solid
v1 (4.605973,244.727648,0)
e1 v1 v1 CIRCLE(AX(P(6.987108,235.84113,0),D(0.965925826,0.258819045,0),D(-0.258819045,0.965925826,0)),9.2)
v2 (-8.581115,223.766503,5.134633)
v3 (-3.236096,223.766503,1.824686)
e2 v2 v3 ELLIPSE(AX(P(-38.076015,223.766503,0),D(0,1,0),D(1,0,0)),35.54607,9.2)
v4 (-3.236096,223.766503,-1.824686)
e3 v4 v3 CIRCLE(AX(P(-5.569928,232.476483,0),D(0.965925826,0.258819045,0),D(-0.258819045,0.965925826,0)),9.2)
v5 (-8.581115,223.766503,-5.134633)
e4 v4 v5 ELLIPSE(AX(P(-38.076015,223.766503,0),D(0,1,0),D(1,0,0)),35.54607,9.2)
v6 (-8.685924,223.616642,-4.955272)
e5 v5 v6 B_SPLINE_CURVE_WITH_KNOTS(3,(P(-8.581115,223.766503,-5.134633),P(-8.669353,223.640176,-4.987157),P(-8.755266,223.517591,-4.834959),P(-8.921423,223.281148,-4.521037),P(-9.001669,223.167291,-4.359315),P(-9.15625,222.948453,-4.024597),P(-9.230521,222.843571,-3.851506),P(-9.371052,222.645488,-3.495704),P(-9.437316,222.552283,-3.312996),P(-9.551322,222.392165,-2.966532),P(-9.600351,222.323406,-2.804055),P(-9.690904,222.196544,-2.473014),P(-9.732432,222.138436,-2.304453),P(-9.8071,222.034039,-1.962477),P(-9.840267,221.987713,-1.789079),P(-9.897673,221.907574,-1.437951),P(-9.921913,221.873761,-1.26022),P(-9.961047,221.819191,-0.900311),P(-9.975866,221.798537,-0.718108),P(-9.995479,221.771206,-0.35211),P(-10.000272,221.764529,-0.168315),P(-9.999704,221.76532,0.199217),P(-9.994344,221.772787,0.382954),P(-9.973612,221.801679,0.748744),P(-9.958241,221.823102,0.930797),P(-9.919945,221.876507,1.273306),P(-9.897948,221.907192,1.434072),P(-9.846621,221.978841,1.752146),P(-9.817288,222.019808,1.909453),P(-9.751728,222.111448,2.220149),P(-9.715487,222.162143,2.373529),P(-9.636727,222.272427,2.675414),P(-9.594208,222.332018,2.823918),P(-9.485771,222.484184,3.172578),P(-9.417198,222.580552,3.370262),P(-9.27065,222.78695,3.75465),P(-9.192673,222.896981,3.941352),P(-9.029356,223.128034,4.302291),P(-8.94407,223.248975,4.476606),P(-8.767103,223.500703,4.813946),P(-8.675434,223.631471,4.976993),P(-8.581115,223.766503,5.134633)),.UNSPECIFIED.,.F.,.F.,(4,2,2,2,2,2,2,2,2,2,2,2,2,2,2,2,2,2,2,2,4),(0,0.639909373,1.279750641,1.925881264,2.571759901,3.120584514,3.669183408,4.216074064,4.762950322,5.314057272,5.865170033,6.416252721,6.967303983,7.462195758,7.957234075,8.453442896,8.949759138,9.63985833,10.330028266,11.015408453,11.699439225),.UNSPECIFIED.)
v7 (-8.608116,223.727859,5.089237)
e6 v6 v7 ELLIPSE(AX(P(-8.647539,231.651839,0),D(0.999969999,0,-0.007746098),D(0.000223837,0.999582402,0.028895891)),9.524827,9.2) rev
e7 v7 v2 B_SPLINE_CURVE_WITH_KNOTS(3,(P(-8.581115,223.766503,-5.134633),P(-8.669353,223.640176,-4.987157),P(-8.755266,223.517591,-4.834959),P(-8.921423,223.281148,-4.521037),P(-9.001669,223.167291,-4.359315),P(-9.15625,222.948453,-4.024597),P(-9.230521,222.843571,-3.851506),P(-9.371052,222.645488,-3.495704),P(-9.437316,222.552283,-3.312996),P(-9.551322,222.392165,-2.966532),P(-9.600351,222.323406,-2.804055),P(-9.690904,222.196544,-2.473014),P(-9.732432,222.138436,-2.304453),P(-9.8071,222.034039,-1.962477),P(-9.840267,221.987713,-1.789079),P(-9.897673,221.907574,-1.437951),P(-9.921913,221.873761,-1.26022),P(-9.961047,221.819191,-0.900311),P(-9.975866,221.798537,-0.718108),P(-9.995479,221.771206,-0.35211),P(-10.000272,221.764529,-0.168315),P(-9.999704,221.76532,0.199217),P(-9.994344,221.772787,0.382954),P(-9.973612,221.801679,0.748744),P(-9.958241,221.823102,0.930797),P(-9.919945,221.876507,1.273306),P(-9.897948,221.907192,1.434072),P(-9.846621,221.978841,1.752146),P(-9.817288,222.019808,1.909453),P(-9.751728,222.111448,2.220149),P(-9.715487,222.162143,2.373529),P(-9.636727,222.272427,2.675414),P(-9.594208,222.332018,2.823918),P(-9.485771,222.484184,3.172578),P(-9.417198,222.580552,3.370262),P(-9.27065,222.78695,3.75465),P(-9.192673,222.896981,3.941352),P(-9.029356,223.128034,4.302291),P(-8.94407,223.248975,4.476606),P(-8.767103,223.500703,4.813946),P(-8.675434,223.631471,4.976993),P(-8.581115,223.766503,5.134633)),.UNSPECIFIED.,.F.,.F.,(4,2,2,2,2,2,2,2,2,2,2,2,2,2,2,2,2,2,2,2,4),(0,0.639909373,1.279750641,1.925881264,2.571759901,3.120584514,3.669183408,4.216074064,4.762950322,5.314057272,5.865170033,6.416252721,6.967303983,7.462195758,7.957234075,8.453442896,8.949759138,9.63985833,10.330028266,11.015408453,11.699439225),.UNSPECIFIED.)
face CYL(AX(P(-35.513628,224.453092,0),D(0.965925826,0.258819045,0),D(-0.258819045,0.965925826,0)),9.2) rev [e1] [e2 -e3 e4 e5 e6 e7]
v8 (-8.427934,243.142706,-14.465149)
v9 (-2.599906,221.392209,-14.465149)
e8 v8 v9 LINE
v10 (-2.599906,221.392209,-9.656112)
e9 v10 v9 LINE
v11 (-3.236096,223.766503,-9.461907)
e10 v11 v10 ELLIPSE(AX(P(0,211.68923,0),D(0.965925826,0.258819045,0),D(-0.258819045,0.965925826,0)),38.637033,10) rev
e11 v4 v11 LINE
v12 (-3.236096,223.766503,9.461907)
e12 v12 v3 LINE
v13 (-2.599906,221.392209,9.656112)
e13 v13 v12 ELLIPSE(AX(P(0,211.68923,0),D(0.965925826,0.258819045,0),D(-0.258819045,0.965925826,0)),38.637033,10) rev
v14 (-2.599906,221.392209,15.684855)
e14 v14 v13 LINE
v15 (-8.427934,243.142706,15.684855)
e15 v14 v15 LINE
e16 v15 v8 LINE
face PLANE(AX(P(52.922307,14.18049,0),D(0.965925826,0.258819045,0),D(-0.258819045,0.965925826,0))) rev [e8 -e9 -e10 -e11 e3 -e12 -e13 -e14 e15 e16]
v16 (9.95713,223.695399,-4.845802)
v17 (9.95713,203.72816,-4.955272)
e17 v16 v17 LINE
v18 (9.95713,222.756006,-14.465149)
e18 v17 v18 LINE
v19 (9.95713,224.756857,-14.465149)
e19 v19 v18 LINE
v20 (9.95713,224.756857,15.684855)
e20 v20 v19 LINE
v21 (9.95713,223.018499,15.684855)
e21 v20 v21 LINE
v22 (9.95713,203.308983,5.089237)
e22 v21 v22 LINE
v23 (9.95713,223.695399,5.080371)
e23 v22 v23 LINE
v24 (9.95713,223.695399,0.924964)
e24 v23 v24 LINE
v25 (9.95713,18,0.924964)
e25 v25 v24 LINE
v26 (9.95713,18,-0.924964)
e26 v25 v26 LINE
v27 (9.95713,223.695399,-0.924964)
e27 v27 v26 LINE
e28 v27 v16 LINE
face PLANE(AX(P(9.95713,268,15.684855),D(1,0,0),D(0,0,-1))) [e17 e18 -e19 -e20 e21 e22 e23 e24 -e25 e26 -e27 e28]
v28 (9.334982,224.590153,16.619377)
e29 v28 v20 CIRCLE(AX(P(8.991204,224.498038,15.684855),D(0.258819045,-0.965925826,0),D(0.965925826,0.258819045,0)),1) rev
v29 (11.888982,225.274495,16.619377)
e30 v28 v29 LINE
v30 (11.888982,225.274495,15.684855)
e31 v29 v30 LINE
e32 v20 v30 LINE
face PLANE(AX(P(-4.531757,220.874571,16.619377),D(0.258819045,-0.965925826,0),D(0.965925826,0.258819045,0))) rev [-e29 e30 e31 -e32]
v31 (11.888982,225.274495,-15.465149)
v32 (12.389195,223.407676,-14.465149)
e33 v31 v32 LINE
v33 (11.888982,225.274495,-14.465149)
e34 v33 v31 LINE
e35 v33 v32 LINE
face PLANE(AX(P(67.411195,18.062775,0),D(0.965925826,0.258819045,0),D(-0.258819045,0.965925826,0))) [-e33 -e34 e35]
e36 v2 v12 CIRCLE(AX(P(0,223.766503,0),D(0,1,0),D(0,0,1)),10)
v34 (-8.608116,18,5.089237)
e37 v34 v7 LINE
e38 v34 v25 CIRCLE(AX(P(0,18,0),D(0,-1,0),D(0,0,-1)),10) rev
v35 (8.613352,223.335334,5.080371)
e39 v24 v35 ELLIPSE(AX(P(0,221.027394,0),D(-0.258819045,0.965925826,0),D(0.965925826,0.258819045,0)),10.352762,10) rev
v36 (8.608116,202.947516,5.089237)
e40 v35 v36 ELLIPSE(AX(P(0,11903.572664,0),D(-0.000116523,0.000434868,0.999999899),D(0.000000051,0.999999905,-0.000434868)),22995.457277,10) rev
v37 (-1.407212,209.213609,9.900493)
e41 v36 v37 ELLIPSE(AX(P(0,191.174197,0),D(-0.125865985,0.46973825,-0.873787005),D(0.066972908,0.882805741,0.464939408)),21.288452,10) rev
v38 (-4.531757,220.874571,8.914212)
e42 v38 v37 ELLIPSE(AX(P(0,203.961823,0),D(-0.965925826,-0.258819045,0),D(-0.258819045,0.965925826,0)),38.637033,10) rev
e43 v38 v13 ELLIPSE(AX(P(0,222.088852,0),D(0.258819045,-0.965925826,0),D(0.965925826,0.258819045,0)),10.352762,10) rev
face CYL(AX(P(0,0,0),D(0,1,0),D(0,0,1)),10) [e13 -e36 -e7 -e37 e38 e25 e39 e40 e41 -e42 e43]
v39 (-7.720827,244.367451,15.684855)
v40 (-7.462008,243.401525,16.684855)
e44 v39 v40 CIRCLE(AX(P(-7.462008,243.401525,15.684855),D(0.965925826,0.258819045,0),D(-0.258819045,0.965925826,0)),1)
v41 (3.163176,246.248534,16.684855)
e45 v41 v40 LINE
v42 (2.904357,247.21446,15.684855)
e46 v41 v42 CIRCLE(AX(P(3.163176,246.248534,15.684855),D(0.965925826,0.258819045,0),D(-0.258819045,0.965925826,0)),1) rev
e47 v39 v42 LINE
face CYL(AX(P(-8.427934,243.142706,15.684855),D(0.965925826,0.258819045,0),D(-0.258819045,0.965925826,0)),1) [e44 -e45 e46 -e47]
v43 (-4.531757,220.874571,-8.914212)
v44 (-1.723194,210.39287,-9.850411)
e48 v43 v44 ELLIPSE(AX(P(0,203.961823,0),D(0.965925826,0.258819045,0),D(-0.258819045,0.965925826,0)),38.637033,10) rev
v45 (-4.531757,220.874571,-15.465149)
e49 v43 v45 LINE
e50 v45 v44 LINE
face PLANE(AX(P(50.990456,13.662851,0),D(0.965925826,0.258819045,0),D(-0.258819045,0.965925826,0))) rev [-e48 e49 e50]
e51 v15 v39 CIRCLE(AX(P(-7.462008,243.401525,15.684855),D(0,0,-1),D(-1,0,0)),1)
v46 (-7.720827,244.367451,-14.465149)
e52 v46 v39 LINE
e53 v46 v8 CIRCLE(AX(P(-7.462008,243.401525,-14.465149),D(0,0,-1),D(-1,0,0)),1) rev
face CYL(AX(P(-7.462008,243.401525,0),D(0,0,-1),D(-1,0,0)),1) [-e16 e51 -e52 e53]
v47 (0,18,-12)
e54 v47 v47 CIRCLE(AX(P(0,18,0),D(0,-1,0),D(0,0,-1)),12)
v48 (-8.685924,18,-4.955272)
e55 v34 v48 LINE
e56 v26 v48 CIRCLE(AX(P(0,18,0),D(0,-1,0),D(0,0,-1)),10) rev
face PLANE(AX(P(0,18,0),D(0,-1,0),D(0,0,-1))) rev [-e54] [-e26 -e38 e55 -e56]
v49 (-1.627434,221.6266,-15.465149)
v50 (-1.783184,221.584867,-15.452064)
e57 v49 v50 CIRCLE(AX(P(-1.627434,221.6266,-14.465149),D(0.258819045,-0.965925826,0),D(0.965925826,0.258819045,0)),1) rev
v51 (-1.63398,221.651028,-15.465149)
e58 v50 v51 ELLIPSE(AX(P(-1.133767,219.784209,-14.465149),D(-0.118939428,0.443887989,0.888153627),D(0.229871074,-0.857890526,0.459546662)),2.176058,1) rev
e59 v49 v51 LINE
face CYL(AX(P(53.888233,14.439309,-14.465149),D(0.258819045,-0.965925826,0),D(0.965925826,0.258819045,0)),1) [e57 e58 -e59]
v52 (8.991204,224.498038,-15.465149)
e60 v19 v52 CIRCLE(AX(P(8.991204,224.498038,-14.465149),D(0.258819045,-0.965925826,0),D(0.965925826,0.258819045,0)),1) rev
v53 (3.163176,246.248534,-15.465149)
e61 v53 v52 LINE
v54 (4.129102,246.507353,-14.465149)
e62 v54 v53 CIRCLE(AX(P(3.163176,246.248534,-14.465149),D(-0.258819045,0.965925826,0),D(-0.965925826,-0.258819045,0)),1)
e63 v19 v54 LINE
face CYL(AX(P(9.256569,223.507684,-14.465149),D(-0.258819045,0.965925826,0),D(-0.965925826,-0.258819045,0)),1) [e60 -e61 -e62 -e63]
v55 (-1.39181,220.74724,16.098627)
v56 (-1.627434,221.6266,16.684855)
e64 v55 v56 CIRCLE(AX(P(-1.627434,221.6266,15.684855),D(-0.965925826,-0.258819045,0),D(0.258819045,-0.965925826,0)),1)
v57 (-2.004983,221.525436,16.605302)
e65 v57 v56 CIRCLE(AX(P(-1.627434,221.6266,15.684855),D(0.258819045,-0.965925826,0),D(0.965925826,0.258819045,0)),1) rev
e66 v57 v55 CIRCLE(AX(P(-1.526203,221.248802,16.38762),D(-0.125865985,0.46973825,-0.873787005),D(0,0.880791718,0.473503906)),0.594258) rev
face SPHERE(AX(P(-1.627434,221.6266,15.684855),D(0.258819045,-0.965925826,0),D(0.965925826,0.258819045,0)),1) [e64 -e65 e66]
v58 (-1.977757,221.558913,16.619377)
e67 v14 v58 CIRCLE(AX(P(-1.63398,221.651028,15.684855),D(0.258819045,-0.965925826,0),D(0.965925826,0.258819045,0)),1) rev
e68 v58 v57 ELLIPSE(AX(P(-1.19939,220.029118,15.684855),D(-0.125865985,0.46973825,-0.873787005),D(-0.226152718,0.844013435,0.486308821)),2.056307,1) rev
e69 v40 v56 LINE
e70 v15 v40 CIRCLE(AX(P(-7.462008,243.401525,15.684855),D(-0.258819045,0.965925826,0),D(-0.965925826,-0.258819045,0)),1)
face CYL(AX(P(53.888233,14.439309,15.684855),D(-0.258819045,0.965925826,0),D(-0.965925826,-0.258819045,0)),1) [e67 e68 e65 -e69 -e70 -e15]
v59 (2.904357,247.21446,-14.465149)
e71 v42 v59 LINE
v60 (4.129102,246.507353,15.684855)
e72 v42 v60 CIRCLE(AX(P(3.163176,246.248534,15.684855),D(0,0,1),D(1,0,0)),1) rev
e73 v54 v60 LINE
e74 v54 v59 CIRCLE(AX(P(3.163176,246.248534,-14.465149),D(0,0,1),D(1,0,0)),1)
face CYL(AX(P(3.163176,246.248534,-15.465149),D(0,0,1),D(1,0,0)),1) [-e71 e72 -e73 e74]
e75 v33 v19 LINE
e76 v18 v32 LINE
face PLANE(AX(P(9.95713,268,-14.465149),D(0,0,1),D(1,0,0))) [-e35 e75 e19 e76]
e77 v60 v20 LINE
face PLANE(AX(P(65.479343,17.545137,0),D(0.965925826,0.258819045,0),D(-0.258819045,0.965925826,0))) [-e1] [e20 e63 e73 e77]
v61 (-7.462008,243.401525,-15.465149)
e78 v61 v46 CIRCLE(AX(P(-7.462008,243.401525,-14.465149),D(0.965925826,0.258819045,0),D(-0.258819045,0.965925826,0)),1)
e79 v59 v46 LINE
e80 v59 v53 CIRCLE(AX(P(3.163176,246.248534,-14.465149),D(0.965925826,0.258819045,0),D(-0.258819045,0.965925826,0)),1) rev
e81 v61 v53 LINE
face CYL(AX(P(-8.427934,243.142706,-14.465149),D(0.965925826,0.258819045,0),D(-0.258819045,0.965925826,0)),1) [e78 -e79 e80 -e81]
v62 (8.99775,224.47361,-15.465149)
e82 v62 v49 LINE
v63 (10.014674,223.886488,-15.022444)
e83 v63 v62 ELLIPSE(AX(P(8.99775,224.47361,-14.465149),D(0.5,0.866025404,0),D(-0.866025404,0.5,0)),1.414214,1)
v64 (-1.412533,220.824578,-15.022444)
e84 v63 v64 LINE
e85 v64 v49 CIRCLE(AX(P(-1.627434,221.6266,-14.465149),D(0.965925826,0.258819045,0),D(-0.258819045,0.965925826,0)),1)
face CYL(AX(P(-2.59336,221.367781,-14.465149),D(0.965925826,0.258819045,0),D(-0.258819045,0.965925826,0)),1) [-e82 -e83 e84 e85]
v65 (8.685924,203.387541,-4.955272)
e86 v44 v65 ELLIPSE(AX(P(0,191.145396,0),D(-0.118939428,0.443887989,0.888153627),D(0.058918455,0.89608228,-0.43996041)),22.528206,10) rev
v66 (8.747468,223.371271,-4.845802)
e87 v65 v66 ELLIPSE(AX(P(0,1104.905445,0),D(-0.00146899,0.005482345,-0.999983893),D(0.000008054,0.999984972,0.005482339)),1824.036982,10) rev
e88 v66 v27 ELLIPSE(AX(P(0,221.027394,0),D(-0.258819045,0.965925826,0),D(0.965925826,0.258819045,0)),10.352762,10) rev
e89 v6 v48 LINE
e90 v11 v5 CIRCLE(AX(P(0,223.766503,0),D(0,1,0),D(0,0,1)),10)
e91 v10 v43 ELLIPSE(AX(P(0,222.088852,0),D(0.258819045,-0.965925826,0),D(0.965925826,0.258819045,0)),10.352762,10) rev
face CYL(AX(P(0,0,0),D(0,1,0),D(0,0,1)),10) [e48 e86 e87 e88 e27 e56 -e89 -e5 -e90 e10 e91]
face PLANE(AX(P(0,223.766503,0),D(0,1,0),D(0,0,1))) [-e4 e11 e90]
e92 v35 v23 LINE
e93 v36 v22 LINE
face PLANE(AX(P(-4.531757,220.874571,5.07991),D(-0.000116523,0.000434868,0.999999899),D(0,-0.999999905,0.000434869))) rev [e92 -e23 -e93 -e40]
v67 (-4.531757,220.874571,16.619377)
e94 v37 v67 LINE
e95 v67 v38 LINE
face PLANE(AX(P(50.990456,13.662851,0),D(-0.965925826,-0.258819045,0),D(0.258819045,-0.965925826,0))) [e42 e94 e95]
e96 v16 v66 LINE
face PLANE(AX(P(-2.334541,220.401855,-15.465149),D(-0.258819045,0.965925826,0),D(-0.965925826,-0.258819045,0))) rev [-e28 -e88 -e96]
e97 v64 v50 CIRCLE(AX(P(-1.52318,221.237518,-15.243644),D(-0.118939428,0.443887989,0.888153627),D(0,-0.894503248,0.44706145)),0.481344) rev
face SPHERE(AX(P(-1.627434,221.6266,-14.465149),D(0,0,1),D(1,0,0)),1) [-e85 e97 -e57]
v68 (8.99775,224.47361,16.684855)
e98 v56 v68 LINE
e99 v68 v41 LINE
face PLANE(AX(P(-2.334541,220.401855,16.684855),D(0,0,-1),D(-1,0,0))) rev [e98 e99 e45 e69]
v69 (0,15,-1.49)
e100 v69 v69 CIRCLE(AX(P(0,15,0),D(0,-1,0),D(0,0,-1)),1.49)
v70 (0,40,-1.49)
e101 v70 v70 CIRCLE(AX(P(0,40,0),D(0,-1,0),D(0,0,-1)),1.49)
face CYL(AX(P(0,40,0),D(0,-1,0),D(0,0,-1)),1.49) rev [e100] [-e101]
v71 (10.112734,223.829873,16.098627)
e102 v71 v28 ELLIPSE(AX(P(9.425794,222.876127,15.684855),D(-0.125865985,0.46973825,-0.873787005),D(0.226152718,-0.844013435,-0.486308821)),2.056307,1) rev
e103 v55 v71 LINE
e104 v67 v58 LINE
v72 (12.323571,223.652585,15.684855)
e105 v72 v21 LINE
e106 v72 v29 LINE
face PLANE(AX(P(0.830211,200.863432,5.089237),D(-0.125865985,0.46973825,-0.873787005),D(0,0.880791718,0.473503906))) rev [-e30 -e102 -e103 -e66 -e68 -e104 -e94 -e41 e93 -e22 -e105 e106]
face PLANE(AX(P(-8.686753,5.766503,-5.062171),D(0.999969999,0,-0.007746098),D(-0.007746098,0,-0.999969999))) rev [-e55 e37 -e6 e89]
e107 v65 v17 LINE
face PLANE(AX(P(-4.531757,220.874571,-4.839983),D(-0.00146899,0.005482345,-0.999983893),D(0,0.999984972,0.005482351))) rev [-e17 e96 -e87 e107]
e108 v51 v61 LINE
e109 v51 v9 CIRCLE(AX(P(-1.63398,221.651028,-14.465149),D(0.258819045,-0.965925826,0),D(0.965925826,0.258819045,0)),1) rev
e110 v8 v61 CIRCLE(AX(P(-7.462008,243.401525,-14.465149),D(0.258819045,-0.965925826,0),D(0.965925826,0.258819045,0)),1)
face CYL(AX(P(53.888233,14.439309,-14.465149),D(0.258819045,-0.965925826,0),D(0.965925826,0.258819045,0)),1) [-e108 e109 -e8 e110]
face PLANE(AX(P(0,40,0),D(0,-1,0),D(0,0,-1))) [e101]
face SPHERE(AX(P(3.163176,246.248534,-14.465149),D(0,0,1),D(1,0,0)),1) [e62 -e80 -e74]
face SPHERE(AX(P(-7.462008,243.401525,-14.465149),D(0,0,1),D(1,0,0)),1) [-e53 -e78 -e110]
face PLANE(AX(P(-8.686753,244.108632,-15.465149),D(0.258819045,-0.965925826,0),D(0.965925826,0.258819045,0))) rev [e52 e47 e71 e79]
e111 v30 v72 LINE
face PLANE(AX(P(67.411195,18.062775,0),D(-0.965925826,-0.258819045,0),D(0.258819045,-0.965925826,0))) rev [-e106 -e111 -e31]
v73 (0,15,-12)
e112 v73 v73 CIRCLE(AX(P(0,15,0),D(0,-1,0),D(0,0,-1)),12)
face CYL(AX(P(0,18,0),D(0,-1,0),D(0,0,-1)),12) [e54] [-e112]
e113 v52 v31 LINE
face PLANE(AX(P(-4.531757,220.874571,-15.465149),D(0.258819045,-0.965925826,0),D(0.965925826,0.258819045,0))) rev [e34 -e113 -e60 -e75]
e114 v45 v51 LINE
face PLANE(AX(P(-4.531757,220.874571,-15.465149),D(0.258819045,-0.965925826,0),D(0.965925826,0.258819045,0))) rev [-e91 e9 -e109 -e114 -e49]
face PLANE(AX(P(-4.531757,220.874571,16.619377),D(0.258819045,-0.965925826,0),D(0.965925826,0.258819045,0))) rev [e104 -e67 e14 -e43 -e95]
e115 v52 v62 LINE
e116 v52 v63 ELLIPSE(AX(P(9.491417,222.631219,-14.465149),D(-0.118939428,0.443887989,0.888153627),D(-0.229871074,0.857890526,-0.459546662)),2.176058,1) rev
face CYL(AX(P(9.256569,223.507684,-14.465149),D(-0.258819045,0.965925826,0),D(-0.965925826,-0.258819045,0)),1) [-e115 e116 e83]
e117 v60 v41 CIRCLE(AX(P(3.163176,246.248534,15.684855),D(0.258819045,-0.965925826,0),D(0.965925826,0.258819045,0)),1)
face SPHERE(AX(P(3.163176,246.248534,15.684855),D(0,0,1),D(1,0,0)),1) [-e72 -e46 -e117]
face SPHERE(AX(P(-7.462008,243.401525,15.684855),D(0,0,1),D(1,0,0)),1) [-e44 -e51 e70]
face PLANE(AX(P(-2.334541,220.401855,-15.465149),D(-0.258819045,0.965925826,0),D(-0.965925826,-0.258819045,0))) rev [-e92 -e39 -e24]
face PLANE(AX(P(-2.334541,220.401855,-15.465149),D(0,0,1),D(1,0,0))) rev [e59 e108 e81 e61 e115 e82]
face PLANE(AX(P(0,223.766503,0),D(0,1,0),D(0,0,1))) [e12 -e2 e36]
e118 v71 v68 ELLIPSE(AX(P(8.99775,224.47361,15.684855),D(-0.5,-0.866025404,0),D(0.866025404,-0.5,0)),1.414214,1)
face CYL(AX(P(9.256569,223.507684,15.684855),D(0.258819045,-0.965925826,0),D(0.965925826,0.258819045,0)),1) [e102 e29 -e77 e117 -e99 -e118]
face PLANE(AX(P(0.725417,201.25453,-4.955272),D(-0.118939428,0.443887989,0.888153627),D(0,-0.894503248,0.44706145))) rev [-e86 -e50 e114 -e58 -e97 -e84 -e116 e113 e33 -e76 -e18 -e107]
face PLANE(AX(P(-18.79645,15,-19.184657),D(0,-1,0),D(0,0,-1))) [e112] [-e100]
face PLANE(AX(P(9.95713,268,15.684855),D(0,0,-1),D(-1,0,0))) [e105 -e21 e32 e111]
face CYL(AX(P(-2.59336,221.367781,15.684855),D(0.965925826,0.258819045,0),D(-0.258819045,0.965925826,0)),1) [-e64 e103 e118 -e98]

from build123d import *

# Parameters (mm, degrees)
SKETCH_1_R               = 15
SKETCH_1_R_2             = 10
SKETCH_1_R_3             = 1.070370935
EXTRUDE_2_DEPTH          = 3
EXTRUDE_7_DEPTH          = 220.766502815
EXTRUDE_7_DEPTH_BACK     = 3
SKETCH_3_R               = 10
SKETCH_6_W               = 32.150004278
SKETCH_6_H               = 24.543060803
EXTRUDE_8_DEPTH          = 13
SKETCH_7_R               = 9.2
CUT_EXTRUDE_1_DEPTH      = 44
CUT_EXTRUDE_2_DEPTH      = 218
FILLET_1_R               = 1
FILLET_2_R               = 1
FILLET_3_R               = 1
EXTRUDE_9_DEPTH          = 15
EXTRUDE_9_DEPTH_BACK     = 2
SKETCH_10_W              = 8.615383554
SKETCH_10_H              = 30.150004278
CUT_EXTRUDE_3_DEPTH      = 265
CUT_EXTRUDE_4_DEPTH      = 10
CUT_EXTRUDE_4_DEPTH_BACK = 111
SKETCH_12_W              = 40.878647102
SKETCH_12_H              = 15
SKETCH_13_R              = 12
EXTRUDE_10_DEPTH         = 3
SKETCH_14_R              = 1.49
CUT_EXTRUDE_5_DEPTH      = 25


with BuildPart() as part:
    # 草图1 → 凸台-拉伸2 (new body)
    with BuildSketch(Plane(origin=(0, 0, 0), x_dir=(1, 0, 0), z_dir=(0, 1, 0))):
        with Locations(Location((0, 0, 0), (0, 0, 270))):
            Circle(SKETCH_1_R)
        with Locations(Location((0, 0, 0), (0, 0, 270))):
            Circle(SKETCH_1_R_2, mode=Mode.SUBTRACT)
        with Locations(Location((12, 0, 0), (0, 0, 270))):
            Circle(SKETCH_1_R_3, mode=Mode.SUBTRACT)
        with Locations(Location((-12, 0, 0), (0, 0, 270))):
            Circle(SKETCH_1_R_3, mode=Mode.SUBTRACT)
        with Locations(Location((0, 12, 0), (0, 0, 270))):
            Circle(SKETCH_1_R_3, mode=Mode.SUBTRACT)
        with Locations(Location((0, -12, 0), (0, 0, 270))):
            Circle(SKETCH_1_R_3, mode=Mode.SUBTRACT)
    extrude(amount=EXTRUDE_2_DEPTH)

    # 草图3 → 凸台-拉伸7 (add, two sides: drawn at the far end of the back side and taken through both)
    with BuildSketch(Plane(origin=(0, 3, 0), x_dir=(1, 0, 0), z_dir=(0, 1, 0)).offset(-EXTRUDE_7_DEPTH_BACK)):
        with Locations(Location((0, 0, 0), (0, 0, 270))):
            Circle(SKETCH_3_R)
    extrude(amount=EXTRUDE_7_DEPTH + EXTRUDE_7_DEPTH_BACK)

    # 草图6 → 凸台-拉伸8 (add)
    with BuildSketch(Plane(origin=(65.479343136, 17.545137114, 0), x_dir=(0, 0, 1), z_dir=(-0.9659258262890673, -0.25881904510252474, 0))):
        with Locations((0.609852797, 225.767598204)):
            Rectangle(SKETCH_6_W, SKETCH_6_H)
    extrude(amount=EXTRUDE_8_DEPTH)

    # 草图7 → 切除-拉伸1 (cut)
    with BuildSketch(Plane(origin=(65.479343136, 17.545137114, 0), x_dir=(0, 0, -1), z_dir=(0.9659258262890673, 0.25881904510252474, 0))):
        with Locations(Location((0, 225.99664207, 0), (0, 0, 90))):
            Circle(SKETCH_7_R)
    extrude(amount=-CUT_EXTRUDE_1_DEPTH, mode=Mode.SUBTRACT)

    # 草图8 → 切除-拉伸2 (cut)
    with BuildSketch(Plane(origin=(0, 223.766502815, 0), x_dir=(1, 0, 0), z_dir=(0, 1, 0))):
        Polygon((-8.686752569, 5.062170738), (-8.608116415, -5.089236857), (-12.71958383, -5.121085641), (-12.798219984, 5.030321955), align=None)
    extrude(amount=-CUT_EXTRUDE_2_DEPTH, mode=Mode.SUBTRACT)

    # 圆角1
    fillet_1_edges = [part.edges().sort_by_distance(p)[0] for p in [
        (-2.408234698, 245.790955307, -15.465149342),
        (3.870283173, 247.473279101, 0.609852797),
        (-2.408234698, 245.790955307, 16.684854936),
        (-8.686752569, 244.108631514, 0.609852797),
    ]]
    fillet(fillet_1_edges, radius=FILLET_1_R)

    # 圆角2
    # the kernel refuses this fillet: 1 mm, written as the material it takes off along each edge
    with BuildSketch(Plane(origin=(3.163176392, 246.248534229, -14.465149342), x_dir=(0.9659258262890673, 0.25881904510252474, 0), z_dir=(0, 0, -1))) as fillet_2_piece_1_section:
        Polygon((0, 0), (FILLET_2_R * 1.02, 0), (FILLET_2_R * 1.02, -FILLET_2_R * 1.02), (0, -FILLET_2_R * 1.02), align=None)
    fillet_2_piece_1 = extrude(amount=FILLET_2_R * 1.02, mode=Mode.PRIVATE)
    fillet_2_piece_1 = fillet_2_piece_1 - Plane(origin=(3.163176392, 246.248534229, -14.465149342), x_dir=(-0.49999999999999645, -0.8660254037844407, 0), z_dir=(0, 0, -1)) * Sphere(FILLET_2_R, mode=Mode.PRIVATE)
    add(fillet_2_piece_1, mode=Mode.SUBTRACT)
    with BuildSketch(Plane(origin=(-7.462007697, 243.401524733, -14.465149342), x_dir=(0, 0, -1), z_dir=(-0.9659258262890673, -0.25881904510252474, 0))) as fillet_2_piece_2_section:
        Polygon((0, 0), (FILLET_2_R * 1.02, 0), (FILLET_2_R * 1.02, -FILLET_2_R * 1.02), (0, -FILLET_2_R * 1.02), align=None)
    fillet_2_piece_2 = extrude(amount=FILLET_2_R * 1.02, mode=Mode.PRIVATE)
    fillet_2_piece_2 = fillet_2_piece_2 - Plane(origin=(-7.462007697, 243.401524733, -14.465149342), x_dir=(0.1830127018922222, -0.6830127018922186, 0.7071067811865475), z_dir=(-0.9659258262890673, -0.25881904510252474, 0)) * Sphere(FILLET_2_R, mode=Mode.PRIVATE)
    add(fillet_2_piece_2, mode=Mode.SUBTRACT)
    with BuildSketch(Plane(origin=(-7.462007697, 243.401524733, 15.684854936), x_dir=(0, 0, 1), z_dir=(-0.9659258262890673, -0.25881904510252474, 0))) as fillet_2_piece_3_section:
        Polygon((0, 0), (FILLET_2_R * 1.02, 0), (FILLET_2_R * 1.02, FILLET_2_R * 1.02), (0, FILLET_2_R * 1.02), align=None)
    fillet_2_piece_3 = extrude(amount=FILLET_2_R * 1.02, mode=Mode.PRIVATE)
    fillet_2_piece_3 = fillet_2_piece_3 - Plane(origin=(-7.462007697, 243.401524733, 15.684854936), x_dir=(0.18301270189222205, -0.6830127018922186, -0.7071067811865475), z_dir=(-0.9659258262890673, -0.25881904510252474, 0)) * Sphere(FILLET_2_R, mode=Mode.PRIVATE)
    add(fillet_2_piece_3, mode=Mode.SUBTRACT)
    with BuildSketch(Plane(origin=(3.163176392, 246.248534229, 15.684854936), x_dir=(0.9659258262890673, 0.25881904510252474, 0), z_dir=(0, 0, 1))) as fillet_2_piece_4_section:
        Polygon((0, 0), (FILLET_2_R * 1.02, 0), (FILLET_2_R * 1.02, FILLET_2_R * 1.02), (0, FILLET_2_R * 1.02), align=None)
    fillet_2_piece_4 = extrude(amount=FILLET_2_R * 1.02, mode=Mode.PRIVATE)
    fillet_2_piece_4 = fillet_2_piece_4 - Plane(origin=(3.163176392, 246.248534229, 15.684854936), x_dir=(-0.49999999999999645, -0.8660254037844407, 0), z_dir=(0, 0, 1)) * Sphere(FILLET_2_R, mode=Mode.PRIVATE)
    add(fillet_2_piece_4, mode=Mode.SUBTRACT)
    with BuildSketch(Plane(origin=(-1.627434227, 221.6266001, 15.684854936), x_dir=(0, 0, 1), z_dir=(-0.9659258262890673, -0.25881904510252474, 0))) as fillet_2_piece_5_section:
        Polygon((0, 0), (FILLET_2_R * 1.02, 0), (FILLET_2_R * 1.02, -FILLET_2_R * 1.02), (0, -FILLET_2_R * 1.02), align=None)
    fillet_2_piece_5 = extrude(amount=FILLET_2_R * 1.02, mode=Mode.PRIVATE)
    fillet_2_piece_5 = fillet_2_piece_5 - Plane(origin=(-1.627434227, 221.6266001, 15.684854936), x_dir=(-0.1830127018922222, 0.6830127018922186, -0.7071067811865475), z_dir=(-0.9659258262890673, -0.25881904510252474, 0)) * Sphere(FILLET_2_R, mode=Mode.PRIVATE)
    add(fillet_2_piece_5, mode=Mode.SUBTRACT)
    with BuildSketch(Plane(origin=(12.6373093, 224.413550428, -15.465149342), x_dir=(0, 0, 1), z_dir=(-0.9659258262890673, -0.25881904510252474, 0))) as fillet_2_piece_6:
        with BuildLine():
            CenterArc((FILLET_2_R, FILLET_2_R), FILLET_2_R, 180, 90)
            Line((0, FILLET_2_R), (0, 0))
            Line((0, 0), (FILLET_2_R, 0))
        make_face()
    extrude(amount=18, mode=Mode.SUBTRACT)
    with BuildSketch(Plane(origin=(4.129102218, 246.507353274, -15.465149342), x_dir=(-0.9659258262890672, -0.2588190451025247, 0), z_dir=(0.25881904510252474, -0.9659258262890673, 0)), Plane(origin=(-8.427933524, 243.142705688, -15.465149342), x_dir=(0, 0, 1), z_dir=(0.25881904510252474, -0.9659258262890673, 0)), Plane(origin=(10.869542347, 221.35168825, 16.684854936), x_dir=(-0.9659258262890672, -0.2588190451025247, 0), z_dir=(-0.25881904510252474, 0.9659258262890673, 0))) as fillet_2_piece_7:
        with BuildLine():
            CenterArc((FILLET_2_R, -FILLET_2_R), FILLET_2_R, 90, 90)
            Line((0, -FILLET_2_R), (0, 0))
            Line((0, 0), (FILLET_2_R, 0))
        make_face()
    extrude(amount=26.043060803, mode=Mode.SUBTRACT)
    with BuildSketch(Plane(origin=(12.6373093, 224.413550428, 16.684854936), x_dir=(-0.2588190451025247, 0.9659258262890672, 0), z_dir=(-0.9659258262890673, -0.25881904510252474, 0))) as fillet_2_piece_8:
        with BuildLine():
            CenterArc((FILLET_2_R, FILLET_2_R), FILLET_2_R, 180, 90)
            Line((0, FILLET_2_R), (0, 0))
            Line((0, 0), (FILLET_2_R, 0))
        make_face()
    extrude(amount=14.5, mode=Mode.SUBTRACT)
    with BuildSketch(Plane(origin=(-2.593360053, 221.367781055, 16.684854936), x_dir=(0, 0, -1), z_dir=(-0.25881904510252474, 0.9659258262890673, 0))) as fillet_2_piece_9:
        with BuildLine():
            CenterArc((FILLET_2_R, -FILLET_2_R), FILLET_2_R, 90, 90)
            Line((0, -FILLET_2_R), (0, 0))
            Line((0, 0), (FILLET_2_R, 0))
        make_face()
    extrude(amount=22.543060803, mode=Mode.SUBTRACT)
    with BuildSketch(Plane(origin=(-2.334541008, 220.401855229, 7.223678228), x_dir=(-0.2588190451025276, 0.9659258262890665, 0), z_dir=(0, 0, 1))) as fillet_2_piece_10_section:
        with BuildLine():
            CenterArc((FILLET_2_R, -FILLET_2_R), FILLET_2_R, 90, 90)
            Line((0, -FILLET_2_R), (0, 0))
            Line((0, 0), (FILLET_2_R, 0))
        make_face()
    fillet_2_piece_10 = extrude(amount=8.461176708, mode=Mode.PRIVATE)
    fillet_2_piece_10 = fillet_2_piece_10 - Plane(origin=(0, 220.67611038, 0), x_dir=(0, 0, 1), z_dir=(0, -1, 0)) * Cylinder(10, 21, mode=Mode.PRIVATE)
    add(fillet_2_piece_10, mode=Mode.SUBTRACT)

    # 圆角3
    # the kernel refuses this fillet: 1 mm, written as the material it takes off along each edge
    with BuildSketch(Plane(origin=(-1.627434227, 221.6266001, -14.465149342), x_dir=(0.25881904510252474, -0.9659258262890673, 0), z_dir=(-0.9659258262890673, -0.25881904510252474, 0))) as fillet_3_piece_1_section:
        Polygon((0, 0), (FILLET_3_R, 0), (FILLET_3_R, -FILLET_3_R), (0, -FILLET_3_R), align=None)
    fillet_3_piece_1 = extrude(amount=FILLET_3_R, mode=Mode.PRIVATE)
    fillet_3_piece_1 = fillet_3_piece_1 - Plane(origin=(-1.627434227, 221.6266001, -14.465149342), x_dir=(-0.18301270189222205, 0.6830127018922186, 0.7071067811865475), z_dir=(-0.9659258262890673, -0.25881904510252474, 0)) * Sphere(FILLET_3_R, mode=Mode.PRIVATE)
    add(fillet_3_piece_1, mode=Mode.SUBTRACT)
    with BuildSketch(Plane(origin=(-2.334541008, 220.401855229, -14.465149342), x_dir=(-0.2588190451025293, 0.9659258262890661, 0), z_dir=(0, 0, 1))) as fillet_3_piece_2_section:
        with BuildLine():
            CenterArc((FILLET_3_R, -FILLET_3_R), FILLET_3_R, 90, 90)
            Line((0, -FILLET_3_R), (0, 0))
            Line((0, 0), (FILLET_3_R, 0))
        make_face()
    fillet_3_piece_2 = extrude(amount=7.241471114, mode=Mode.PRIVATE)
    fillet_3_piece_2 = fillet_3_piece_2 - Plane(origin=(0, 220.680283856, 0), x_dir=(0, 0, 1), z_dir=(0, -1, 0)) * Cylinder(10, 19, mode=Mode.PRIVATE)
    add(fillet_3_piece_2, mode=Mode.SUBTRACT)

    # 草图9 → 凸台-拉伸9 (add, two sides: drawn at the far end of the back side and taken through both)
    with BuildSketch(Plane(origin=(65.479343136, 17.545137114, 0), x_dir=(0, 0, 1), z_dir=(-0.9659258262890673, -0.25881904510252474, 0)).offset(-EXTRUDE_9_DEPTH_BACK)):
        Polygon((-15.465149342, 214.521357737), (-4.839983079, 214.521357737), (-4.955271508, 194.209196023), align=None)
        Polygon((16.619377138, 214.521357737), (5.079909852, 214.521357737), (5.089236857, 193.804302434), align=None)
    extrude(amount=EXTRUDE_9_DEPTH + EXTRUDE_9_DEPTH_BACK)

    # 草图10 → 切除-拉伸3 (cut)
    with BuildSketch(Plane(origin=(0, 3, 0), x_dir=(1, 0, 0), z_dir=(0, 1, 0))):
        with Locations((14.264821949, -0.609852797)):
            Rectangle(SKETCH_10_W, SKETCH_10_H)
    extrude(amount=CUT_EXTRUDE_3_DEPTH, mode=Mode.SUBTRACT)

    # 草图12 → 切除-拉伸4 (cut, two sides: drawn at the far end of the back side and taken through both)
    with BuildSketch(Plane(origin=(-8.647020453, 0, 0.066982674), x_dir=(0.007746097662068172, 0, 0.999969998535461), z_dir=(-0.999969998535461, 0, 0.007746097662068172)).offset(-CUT_EXTRUDE_4_DEPTH_BACK)):
        with Locations((1.109642623, 7.5)):
            Rectangle(SKETCH_12_W, SKETCH_12_H)
    extrude(amount=CUT_EXTRUDE_4_DEPTH + CUT_EXTRUDE_4_DEPTH_BACK, mode=Mode.SUBTRACT)

    # 草图13 → 凸台-拉伸10 (add)
    with BuildSketch(Plane.XZ.offset(-15)):
        with Locations(Location((0, 0, 0), (0, 0, 270))):
            Circle(SKETCH_13_R)
    extrude(amount=-EXTRUDE_10_DEPTH)

    # 草图14 → 切除-拉伸5 (cut)
    with BuildSketch(Plane(origin=(0, 15, 0), x_dir=(-1, 0, 0), z_dir=(0, -1, 0))):
        with Locations(Location((0, 0, 0), (0, 0, 90))):
            Circle(SKETCH_14_R)
    extrude(amount=-CUT_EXTRUDE_5_DEPTH, mode=Mode.SUBTRACT)


solid = part.part
